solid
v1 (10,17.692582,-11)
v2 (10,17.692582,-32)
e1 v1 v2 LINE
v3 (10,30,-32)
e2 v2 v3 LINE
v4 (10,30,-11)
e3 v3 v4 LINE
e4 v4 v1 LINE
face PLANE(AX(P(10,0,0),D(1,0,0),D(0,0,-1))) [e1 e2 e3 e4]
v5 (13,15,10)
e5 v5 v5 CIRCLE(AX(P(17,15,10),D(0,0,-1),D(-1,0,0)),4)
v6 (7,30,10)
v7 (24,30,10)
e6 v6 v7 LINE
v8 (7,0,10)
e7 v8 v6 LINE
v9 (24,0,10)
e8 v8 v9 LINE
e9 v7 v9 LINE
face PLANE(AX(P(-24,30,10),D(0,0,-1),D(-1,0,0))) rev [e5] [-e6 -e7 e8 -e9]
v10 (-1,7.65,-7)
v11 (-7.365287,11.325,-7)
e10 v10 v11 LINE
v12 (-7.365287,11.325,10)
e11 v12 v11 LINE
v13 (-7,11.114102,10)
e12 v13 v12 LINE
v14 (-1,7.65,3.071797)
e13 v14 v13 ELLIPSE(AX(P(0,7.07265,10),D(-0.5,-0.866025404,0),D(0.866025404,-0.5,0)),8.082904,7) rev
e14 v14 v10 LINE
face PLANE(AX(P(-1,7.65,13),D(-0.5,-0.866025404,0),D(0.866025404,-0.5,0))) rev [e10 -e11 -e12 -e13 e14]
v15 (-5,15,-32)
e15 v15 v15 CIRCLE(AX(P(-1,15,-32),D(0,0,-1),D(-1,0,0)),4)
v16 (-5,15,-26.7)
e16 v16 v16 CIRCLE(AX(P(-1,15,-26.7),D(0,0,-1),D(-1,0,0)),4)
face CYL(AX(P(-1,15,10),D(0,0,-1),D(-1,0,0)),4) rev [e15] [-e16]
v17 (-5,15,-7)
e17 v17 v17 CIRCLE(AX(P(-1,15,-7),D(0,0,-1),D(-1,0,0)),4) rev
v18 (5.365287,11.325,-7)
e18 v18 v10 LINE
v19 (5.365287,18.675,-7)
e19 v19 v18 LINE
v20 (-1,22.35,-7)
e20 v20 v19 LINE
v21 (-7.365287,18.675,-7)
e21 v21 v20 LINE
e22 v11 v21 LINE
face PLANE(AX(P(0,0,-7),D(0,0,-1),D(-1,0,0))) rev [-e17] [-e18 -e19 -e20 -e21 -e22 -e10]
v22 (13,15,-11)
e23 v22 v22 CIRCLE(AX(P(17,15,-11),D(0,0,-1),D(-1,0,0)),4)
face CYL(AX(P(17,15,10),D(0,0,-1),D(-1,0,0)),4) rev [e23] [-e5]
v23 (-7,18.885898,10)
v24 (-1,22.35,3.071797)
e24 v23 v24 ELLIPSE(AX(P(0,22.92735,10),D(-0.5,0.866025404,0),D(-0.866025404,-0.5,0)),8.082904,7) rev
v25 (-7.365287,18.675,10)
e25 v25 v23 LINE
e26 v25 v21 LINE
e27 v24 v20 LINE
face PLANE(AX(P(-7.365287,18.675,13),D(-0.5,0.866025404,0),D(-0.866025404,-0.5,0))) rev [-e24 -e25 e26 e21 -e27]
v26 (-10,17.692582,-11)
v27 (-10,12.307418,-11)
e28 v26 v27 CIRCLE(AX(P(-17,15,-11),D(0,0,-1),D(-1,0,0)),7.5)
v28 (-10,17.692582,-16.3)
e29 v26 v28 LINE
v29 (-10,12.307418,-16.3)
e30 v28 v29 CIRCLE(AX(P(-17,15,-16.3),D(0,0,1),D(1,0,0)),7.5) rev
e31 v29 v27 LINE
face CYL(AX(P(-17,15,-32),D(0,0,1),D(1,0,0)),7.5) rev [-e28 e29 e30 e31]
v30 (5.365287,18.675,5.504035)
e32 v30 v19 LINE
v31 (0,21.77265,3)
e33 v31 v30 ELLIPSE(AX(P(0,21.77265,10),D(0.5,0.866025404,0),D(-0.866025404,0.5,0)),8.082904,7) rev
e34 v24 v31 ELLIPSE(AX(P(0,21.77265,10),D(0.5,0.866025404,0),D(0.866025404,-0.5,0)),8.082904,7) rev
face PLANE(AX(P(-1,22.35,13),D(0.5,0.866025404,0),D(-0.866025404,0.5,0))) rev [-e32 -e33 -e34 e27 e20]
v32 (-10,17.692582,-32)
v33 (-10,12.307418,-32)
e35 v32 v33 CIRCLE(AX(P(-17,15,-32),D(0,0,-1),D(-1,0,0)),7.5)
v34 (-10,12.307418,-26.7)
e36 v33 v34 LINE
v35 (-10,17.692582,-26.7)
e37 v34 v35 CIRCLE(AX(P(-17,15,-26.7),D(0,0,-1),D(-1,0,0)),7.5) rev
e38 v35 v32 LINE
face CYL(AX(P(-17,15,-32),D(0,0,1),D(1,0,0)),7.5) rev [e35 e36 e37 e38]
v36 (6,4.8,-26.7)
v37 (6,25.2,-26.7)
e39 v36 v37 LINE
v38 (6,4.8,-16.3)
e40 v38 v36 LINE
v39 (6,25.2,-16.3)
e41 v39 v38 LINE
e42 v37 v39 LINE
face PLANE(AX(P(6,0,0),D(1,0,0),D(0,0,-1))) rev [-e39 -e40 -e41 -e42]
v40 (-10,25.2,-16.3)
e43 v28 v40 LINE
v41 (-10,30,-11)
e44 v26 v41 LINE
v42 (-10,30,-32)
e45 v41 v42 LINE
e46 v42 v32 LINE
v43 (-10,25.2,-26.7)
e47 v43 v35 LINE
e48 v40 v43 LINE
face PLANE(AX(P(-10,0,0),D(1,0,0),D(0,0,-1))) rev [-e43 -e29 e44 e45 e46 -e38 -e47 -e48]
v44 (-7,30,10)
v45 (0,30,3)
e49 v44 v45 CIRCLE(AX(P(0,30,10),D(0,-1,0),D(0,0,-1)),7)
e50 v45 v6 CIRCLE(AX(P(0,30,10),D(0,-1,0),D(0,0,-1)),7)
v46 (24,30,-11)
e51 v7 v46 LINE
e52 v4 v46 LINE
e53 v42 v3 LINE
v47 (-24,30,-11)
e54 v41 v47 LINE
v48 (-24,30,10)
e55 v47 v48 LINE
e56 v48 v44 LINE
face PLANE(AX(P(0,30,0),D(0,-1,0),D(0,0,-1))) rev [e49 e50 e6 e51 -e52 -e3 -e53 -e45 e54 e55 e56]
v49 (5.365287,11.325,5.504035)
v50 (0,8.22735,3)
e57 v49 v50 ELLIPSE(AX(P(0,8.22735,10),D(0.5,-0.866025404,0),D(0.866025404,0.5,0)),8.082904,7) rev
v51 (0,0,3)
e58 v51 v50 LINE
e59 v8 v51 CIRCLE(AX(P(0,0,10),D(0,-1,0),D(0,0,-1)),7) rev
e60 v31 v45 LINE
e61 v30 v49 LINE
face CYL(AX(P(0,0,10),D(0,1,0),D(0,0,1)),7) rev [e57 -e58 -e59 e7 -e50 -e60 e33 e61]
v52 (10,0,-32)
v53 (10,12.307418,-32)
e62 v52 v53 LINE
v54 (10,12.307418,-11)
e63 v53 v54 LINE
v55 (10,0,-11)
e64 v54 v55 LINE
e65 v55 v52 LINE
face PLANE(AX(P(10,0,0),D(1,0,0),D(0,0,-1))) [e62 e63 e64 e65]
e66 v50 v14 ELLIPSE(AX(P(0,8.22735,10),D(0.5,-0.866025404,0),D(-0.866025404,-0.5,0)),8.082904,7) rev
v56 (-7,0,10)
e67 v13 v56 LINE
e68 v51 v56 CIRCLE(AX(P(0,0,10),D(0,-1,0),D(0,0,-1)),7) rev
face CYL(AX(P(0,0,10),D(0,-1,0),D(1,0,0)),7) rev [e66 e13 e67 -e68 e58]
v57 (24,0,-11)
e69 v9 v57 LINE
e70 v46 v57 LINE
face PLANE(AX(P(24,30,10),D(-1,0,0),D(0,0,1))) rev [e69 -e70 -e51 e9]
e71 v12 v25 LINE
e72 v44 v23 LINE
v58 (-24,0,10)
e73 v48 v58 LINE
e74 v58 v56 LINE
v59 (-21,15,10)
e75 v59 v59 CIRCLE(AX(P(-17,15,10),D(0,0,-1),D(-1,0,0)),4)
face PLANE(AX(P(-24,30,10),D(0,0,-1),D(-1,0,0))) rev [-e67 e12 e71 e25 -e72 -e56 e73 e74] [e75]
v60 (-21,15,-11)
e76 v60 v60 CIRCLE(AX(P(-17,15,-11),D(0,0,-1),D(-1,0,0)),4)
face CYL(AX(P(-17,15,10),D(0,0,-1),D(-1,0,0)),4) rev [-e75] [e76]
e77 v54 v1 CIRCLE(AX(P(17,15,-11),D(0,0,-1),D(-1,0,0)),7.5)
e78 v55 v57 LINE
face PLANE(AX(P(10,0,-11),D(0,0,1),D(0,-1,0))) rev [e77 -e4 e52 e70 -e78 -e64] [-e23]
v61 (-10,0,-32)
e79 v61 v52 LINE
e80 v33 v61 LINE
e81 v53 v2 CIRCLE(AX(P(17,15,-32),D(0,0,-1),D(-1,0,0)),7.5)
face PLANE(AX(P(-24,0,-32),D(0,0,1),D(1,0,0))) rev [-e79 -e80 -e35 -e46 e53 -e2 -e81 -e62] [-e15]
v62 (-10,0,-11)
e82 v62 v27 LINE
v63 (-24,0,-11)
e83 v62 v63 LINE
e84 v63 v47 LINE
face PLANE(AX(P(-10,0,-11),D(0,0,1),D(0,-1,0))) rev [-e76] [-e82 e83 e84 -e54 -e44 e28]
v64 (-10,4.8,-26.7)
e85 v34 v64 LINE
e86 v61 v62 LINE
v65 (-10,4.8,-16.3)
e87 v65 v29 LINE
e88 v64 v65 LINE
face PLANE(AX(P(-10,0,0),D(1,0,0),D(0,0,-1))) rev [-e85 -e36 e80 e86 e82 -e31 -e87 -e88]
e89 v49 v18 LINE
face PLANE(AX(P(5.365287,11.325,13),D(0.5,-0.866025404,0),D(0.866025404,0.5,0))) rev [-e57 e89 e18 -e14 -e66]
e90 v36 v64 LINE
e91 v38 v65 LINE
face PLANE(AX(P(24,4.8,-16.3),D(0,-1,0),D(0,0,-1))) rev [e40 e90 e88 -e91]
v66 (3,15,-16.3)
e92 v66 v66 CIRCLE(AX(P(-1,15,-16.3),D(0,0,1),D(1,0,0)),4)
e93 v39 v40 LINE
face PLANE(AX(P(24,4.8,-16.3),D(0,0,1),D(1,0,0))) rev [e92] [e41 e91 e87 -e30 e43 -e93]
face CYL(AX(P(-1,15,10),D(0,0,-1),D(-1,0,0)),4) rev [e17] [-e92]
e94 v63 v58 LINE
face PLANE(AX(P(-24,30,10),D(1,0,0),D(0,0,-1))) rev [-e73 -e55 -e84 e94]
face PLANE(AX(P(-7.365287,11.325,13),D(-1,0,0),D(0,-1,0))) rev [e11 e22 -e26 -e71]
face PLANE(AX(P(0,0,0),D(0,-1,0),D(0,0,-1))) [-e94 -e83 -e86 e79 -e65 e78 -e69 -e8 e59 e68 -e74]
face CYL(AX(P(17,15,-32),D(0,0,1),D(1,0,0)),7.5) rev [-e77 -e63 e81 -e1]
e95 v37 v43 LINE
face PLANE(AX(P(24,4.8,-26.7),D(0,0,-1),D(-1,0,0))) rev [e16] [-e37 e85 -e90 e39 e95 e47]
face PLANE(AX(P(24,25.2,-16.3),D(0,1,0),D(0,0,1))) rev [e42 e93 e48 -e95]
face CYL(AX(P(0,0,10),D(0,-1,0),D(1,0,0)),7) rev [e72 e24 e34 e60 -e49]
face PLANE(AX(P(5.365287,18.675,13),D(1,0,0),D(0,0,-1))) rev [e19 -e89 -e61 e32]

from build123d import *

# Parameters (mm, degrees)
SKETCH_1_W          = 48
SKETCH_1_H          = 20
EXTRUDE_1_DEPTH     = 30
SKETCH_2_W          = 14
SKETCH_2_H          = 30
CUT_EXTRUDE_1_DEPTH = 7
SKETCH_7_W          = 22
SKETCH_7_H          = 30
EXTRUDE_2_DEPTH     = 48
SKETCH_8_W          = 21
SKETCH_8_H          = 30
CUT_EXTRUDE_2_DEPTH = 14
SKETCH_9_W          = 21
SKETCH_9_H          = 30
CUT_EXTRUDE_3_DEPTH = 14
SKETCH_11_W         = 10.4
SKETCH_11_H         = 20.4
CUT_EXTRUDE_4_DEPTH = 56.497747702
SKETCH_13_R         = 4
CUT_EXTRUDE_5_DEPTH = 44.783558558
SKETCH_14_R         = 4
CUT_EXTRUDE_6_DEPTH = 44.783558558
FILLET_1_R          = 7
SKETCH1_W           = 10.4
SKETCH1_H           = 20.4
BOSS_EXTRUDE1_DEPTH = 4
SKETCH_20_R         = 7.5
CUT_EXTRUDE_8_DEPTH = 44.783558558
SKETCH3_R           = 4
CUT_EXTRUDE2_DEPTH  = 57.920997883
CUT_EXTRUDE3_START  = -25
CUT_EXTRUDE3_DEPTH  = 20


with BuildPart() as part:
    # Эскиз1 → Бобышка-Вытянуть1 (new body)
    with BuildSketch(Plane(origin=(0, 0, 0), x_dir=(1, 0, 0), z_dir=(0, 1, 0))):
        Rectangle(SKETCH_1_W, SKETCH_1_H)
    extrude(amount=EXTRUDE_1_DEPTH)

    # Эскиз2 → Вырез-Вытянуть1 (cut)
    with BuildSketch(Plane.XY.offset(10)):
        with Locations((0, 15)):
            Rectangle(SKETCH_2_W, SKETCH_2_H)
    extrude(amount=-CUT_EXTRUDE_1_DEPTH, mode=Mode.SUBTRACT)

    # Эскиз7 → Бобышка-Вытянуть2 (add)
    with BuildSketch(Plane(origin=(24, 0, 0), x_dir=(0, 0, -1), z_dir=(1, 0, 0))):
        with Locations((21, 15)):
            Rectangle(SKETCH_7_W, SKETCH_7_H)
    extrude(amount=-EXTRUDE_2_DEPTH)

    # Эскиз8 → Вырез-Вытянуть2 (cut)
    with BuildSketch(Plane(origin=(24, 0, 0), x_dir=(0, 0, -1), z_dir=(1, 0, 0))):
        with Locations((21.5, 15)):
            Rectangle(SKETCH_8_W, SKETCH_8_H)
    extrude(amount=-CUT_EXTRUDE_2_DEPTH, mode=Mode.SUBTRACT)

    # Эскиз9 → Вырез-Вытянуть3 (cut)
    with BuildSketch(Plane.ZY.offset(24)):
        with Locations((-21.5, 15)):
            Rectangle(SKETCH_9_W, SKETCH_9_H)
    extrude(amount=-CUT_EXTRUDE_3_DEPTH, mode=Mode.SUBTRACT)

    # Эскиз11 → Вырез-Вытянуть4 (cut, through all)
    with BuildSketch(Plane.ZY.offset(10)):
        with Locations((-21.5, 15)):
            Rectangle(SKETCH_11_W, SKETCH_11_H)
    extrude(amount=-CUT_EXTRUDE_4_DEPTH, mode=Mode.SUBTRACT)

    # Эскиз13 → Вырез-Вытянуть5 (cut, through all)
    with BuildSketch(Plane(origin=(0, 0, -11), x_dir=(-1, 0, 0), z_dir=(0, 0, -1))):
        with Locations((17, 15)):
            Circle(SKETCH_13_R)
    extrude(amount=-CUT_EXTRUDE_5_DEPTH, mode=Mode.SUBTRACT)

    # Эскиз14 → Вырез-Вытянуть6 (cut, through all)
    with BuildSketch(Plane(origin=(0, 0, -11), x_dir=(-1, 0, 0), z_dir=(0, 0, -1))):
        with Locations((-17, 15)):
            Circle(SKETCH_14_R)
    extrude(amount=-CUT_EXTRUDE_6_DEPTH, mode=Mode.SUBTRACT)

    # Скругление1
    fillet_1_edges = [part.edges().sort_by_distance(p)[0] for p in [
        (-7, 15, 3),
        (7, 15, 3),
    ]]
    fillet(fillet_1_edges, radius=FILLET_1_R - 0.0001)  # a hair under: the kernel refuses the full size

    # Sketch1 → Boss-Extrude1 (add)
    with BuildSketch(Plane(origin=(10, 0, 0), x_dir=(0, 0, -1), z_dir=(1, 0, 0))):
        with Locations((21.5, 15)):
            Rectangle(SKETCH1_W, SKETCH1_H)
    extrude(amount=-BOSS_EXTRUDE1_DEPTH)

    # Эскиз20 → Вырез-Вытянуть8 (cut, through all)
    with BuildSketch(Plane(origin=(0, 0, -11), x_dir=(-1, 0, 0), z_dir=(0, 0, -1))):
        with Locations((-17, 15)):
            Circle(SKETCH_20_R)
        with Locations((17, 15)):
            Circle(SKETCH_20_R)
    extrude(amount=CUT_EXTRUDE_8_DEPTH, mode=Mode.SUBTRACT)

    # Sketch3 → Cut-Extrude2 (cut, through all)
    with BuildSketch(Plane(origin=(0, 0, -32), x_dir=(-1, 0, 0), z_dir=(0, 0, -1))):
        with Locations(Location((1, 15, 0), (0, 0, 255.522487814))):
            Circle(SKETCH3_R)
    extrude(amount=-CUT_EXTRUDE2_DEPTH, mode=Mode.SUBTRACT)

    # Sketch4 → Cut-Extrude3 (cut)
    with BuildSketch(Plane(origin=(0, 0, -32), x_dir=(-1, 0, 0), z_dir=(0, 0, -1)).offset(CUT_EXTRUDE3_START)):
        Polygon((1, 22.35), (-5.365286718, 18.675), (-5.365286718, 11.325), (1, 7.65), (7.365286718, 11.325), (7.365286718, 18.675), align=None)
    extrude(amount=-CUT_EXTRUDE3_DEPTH, mode=Mode.SUBTRACT)


solid = part.part
